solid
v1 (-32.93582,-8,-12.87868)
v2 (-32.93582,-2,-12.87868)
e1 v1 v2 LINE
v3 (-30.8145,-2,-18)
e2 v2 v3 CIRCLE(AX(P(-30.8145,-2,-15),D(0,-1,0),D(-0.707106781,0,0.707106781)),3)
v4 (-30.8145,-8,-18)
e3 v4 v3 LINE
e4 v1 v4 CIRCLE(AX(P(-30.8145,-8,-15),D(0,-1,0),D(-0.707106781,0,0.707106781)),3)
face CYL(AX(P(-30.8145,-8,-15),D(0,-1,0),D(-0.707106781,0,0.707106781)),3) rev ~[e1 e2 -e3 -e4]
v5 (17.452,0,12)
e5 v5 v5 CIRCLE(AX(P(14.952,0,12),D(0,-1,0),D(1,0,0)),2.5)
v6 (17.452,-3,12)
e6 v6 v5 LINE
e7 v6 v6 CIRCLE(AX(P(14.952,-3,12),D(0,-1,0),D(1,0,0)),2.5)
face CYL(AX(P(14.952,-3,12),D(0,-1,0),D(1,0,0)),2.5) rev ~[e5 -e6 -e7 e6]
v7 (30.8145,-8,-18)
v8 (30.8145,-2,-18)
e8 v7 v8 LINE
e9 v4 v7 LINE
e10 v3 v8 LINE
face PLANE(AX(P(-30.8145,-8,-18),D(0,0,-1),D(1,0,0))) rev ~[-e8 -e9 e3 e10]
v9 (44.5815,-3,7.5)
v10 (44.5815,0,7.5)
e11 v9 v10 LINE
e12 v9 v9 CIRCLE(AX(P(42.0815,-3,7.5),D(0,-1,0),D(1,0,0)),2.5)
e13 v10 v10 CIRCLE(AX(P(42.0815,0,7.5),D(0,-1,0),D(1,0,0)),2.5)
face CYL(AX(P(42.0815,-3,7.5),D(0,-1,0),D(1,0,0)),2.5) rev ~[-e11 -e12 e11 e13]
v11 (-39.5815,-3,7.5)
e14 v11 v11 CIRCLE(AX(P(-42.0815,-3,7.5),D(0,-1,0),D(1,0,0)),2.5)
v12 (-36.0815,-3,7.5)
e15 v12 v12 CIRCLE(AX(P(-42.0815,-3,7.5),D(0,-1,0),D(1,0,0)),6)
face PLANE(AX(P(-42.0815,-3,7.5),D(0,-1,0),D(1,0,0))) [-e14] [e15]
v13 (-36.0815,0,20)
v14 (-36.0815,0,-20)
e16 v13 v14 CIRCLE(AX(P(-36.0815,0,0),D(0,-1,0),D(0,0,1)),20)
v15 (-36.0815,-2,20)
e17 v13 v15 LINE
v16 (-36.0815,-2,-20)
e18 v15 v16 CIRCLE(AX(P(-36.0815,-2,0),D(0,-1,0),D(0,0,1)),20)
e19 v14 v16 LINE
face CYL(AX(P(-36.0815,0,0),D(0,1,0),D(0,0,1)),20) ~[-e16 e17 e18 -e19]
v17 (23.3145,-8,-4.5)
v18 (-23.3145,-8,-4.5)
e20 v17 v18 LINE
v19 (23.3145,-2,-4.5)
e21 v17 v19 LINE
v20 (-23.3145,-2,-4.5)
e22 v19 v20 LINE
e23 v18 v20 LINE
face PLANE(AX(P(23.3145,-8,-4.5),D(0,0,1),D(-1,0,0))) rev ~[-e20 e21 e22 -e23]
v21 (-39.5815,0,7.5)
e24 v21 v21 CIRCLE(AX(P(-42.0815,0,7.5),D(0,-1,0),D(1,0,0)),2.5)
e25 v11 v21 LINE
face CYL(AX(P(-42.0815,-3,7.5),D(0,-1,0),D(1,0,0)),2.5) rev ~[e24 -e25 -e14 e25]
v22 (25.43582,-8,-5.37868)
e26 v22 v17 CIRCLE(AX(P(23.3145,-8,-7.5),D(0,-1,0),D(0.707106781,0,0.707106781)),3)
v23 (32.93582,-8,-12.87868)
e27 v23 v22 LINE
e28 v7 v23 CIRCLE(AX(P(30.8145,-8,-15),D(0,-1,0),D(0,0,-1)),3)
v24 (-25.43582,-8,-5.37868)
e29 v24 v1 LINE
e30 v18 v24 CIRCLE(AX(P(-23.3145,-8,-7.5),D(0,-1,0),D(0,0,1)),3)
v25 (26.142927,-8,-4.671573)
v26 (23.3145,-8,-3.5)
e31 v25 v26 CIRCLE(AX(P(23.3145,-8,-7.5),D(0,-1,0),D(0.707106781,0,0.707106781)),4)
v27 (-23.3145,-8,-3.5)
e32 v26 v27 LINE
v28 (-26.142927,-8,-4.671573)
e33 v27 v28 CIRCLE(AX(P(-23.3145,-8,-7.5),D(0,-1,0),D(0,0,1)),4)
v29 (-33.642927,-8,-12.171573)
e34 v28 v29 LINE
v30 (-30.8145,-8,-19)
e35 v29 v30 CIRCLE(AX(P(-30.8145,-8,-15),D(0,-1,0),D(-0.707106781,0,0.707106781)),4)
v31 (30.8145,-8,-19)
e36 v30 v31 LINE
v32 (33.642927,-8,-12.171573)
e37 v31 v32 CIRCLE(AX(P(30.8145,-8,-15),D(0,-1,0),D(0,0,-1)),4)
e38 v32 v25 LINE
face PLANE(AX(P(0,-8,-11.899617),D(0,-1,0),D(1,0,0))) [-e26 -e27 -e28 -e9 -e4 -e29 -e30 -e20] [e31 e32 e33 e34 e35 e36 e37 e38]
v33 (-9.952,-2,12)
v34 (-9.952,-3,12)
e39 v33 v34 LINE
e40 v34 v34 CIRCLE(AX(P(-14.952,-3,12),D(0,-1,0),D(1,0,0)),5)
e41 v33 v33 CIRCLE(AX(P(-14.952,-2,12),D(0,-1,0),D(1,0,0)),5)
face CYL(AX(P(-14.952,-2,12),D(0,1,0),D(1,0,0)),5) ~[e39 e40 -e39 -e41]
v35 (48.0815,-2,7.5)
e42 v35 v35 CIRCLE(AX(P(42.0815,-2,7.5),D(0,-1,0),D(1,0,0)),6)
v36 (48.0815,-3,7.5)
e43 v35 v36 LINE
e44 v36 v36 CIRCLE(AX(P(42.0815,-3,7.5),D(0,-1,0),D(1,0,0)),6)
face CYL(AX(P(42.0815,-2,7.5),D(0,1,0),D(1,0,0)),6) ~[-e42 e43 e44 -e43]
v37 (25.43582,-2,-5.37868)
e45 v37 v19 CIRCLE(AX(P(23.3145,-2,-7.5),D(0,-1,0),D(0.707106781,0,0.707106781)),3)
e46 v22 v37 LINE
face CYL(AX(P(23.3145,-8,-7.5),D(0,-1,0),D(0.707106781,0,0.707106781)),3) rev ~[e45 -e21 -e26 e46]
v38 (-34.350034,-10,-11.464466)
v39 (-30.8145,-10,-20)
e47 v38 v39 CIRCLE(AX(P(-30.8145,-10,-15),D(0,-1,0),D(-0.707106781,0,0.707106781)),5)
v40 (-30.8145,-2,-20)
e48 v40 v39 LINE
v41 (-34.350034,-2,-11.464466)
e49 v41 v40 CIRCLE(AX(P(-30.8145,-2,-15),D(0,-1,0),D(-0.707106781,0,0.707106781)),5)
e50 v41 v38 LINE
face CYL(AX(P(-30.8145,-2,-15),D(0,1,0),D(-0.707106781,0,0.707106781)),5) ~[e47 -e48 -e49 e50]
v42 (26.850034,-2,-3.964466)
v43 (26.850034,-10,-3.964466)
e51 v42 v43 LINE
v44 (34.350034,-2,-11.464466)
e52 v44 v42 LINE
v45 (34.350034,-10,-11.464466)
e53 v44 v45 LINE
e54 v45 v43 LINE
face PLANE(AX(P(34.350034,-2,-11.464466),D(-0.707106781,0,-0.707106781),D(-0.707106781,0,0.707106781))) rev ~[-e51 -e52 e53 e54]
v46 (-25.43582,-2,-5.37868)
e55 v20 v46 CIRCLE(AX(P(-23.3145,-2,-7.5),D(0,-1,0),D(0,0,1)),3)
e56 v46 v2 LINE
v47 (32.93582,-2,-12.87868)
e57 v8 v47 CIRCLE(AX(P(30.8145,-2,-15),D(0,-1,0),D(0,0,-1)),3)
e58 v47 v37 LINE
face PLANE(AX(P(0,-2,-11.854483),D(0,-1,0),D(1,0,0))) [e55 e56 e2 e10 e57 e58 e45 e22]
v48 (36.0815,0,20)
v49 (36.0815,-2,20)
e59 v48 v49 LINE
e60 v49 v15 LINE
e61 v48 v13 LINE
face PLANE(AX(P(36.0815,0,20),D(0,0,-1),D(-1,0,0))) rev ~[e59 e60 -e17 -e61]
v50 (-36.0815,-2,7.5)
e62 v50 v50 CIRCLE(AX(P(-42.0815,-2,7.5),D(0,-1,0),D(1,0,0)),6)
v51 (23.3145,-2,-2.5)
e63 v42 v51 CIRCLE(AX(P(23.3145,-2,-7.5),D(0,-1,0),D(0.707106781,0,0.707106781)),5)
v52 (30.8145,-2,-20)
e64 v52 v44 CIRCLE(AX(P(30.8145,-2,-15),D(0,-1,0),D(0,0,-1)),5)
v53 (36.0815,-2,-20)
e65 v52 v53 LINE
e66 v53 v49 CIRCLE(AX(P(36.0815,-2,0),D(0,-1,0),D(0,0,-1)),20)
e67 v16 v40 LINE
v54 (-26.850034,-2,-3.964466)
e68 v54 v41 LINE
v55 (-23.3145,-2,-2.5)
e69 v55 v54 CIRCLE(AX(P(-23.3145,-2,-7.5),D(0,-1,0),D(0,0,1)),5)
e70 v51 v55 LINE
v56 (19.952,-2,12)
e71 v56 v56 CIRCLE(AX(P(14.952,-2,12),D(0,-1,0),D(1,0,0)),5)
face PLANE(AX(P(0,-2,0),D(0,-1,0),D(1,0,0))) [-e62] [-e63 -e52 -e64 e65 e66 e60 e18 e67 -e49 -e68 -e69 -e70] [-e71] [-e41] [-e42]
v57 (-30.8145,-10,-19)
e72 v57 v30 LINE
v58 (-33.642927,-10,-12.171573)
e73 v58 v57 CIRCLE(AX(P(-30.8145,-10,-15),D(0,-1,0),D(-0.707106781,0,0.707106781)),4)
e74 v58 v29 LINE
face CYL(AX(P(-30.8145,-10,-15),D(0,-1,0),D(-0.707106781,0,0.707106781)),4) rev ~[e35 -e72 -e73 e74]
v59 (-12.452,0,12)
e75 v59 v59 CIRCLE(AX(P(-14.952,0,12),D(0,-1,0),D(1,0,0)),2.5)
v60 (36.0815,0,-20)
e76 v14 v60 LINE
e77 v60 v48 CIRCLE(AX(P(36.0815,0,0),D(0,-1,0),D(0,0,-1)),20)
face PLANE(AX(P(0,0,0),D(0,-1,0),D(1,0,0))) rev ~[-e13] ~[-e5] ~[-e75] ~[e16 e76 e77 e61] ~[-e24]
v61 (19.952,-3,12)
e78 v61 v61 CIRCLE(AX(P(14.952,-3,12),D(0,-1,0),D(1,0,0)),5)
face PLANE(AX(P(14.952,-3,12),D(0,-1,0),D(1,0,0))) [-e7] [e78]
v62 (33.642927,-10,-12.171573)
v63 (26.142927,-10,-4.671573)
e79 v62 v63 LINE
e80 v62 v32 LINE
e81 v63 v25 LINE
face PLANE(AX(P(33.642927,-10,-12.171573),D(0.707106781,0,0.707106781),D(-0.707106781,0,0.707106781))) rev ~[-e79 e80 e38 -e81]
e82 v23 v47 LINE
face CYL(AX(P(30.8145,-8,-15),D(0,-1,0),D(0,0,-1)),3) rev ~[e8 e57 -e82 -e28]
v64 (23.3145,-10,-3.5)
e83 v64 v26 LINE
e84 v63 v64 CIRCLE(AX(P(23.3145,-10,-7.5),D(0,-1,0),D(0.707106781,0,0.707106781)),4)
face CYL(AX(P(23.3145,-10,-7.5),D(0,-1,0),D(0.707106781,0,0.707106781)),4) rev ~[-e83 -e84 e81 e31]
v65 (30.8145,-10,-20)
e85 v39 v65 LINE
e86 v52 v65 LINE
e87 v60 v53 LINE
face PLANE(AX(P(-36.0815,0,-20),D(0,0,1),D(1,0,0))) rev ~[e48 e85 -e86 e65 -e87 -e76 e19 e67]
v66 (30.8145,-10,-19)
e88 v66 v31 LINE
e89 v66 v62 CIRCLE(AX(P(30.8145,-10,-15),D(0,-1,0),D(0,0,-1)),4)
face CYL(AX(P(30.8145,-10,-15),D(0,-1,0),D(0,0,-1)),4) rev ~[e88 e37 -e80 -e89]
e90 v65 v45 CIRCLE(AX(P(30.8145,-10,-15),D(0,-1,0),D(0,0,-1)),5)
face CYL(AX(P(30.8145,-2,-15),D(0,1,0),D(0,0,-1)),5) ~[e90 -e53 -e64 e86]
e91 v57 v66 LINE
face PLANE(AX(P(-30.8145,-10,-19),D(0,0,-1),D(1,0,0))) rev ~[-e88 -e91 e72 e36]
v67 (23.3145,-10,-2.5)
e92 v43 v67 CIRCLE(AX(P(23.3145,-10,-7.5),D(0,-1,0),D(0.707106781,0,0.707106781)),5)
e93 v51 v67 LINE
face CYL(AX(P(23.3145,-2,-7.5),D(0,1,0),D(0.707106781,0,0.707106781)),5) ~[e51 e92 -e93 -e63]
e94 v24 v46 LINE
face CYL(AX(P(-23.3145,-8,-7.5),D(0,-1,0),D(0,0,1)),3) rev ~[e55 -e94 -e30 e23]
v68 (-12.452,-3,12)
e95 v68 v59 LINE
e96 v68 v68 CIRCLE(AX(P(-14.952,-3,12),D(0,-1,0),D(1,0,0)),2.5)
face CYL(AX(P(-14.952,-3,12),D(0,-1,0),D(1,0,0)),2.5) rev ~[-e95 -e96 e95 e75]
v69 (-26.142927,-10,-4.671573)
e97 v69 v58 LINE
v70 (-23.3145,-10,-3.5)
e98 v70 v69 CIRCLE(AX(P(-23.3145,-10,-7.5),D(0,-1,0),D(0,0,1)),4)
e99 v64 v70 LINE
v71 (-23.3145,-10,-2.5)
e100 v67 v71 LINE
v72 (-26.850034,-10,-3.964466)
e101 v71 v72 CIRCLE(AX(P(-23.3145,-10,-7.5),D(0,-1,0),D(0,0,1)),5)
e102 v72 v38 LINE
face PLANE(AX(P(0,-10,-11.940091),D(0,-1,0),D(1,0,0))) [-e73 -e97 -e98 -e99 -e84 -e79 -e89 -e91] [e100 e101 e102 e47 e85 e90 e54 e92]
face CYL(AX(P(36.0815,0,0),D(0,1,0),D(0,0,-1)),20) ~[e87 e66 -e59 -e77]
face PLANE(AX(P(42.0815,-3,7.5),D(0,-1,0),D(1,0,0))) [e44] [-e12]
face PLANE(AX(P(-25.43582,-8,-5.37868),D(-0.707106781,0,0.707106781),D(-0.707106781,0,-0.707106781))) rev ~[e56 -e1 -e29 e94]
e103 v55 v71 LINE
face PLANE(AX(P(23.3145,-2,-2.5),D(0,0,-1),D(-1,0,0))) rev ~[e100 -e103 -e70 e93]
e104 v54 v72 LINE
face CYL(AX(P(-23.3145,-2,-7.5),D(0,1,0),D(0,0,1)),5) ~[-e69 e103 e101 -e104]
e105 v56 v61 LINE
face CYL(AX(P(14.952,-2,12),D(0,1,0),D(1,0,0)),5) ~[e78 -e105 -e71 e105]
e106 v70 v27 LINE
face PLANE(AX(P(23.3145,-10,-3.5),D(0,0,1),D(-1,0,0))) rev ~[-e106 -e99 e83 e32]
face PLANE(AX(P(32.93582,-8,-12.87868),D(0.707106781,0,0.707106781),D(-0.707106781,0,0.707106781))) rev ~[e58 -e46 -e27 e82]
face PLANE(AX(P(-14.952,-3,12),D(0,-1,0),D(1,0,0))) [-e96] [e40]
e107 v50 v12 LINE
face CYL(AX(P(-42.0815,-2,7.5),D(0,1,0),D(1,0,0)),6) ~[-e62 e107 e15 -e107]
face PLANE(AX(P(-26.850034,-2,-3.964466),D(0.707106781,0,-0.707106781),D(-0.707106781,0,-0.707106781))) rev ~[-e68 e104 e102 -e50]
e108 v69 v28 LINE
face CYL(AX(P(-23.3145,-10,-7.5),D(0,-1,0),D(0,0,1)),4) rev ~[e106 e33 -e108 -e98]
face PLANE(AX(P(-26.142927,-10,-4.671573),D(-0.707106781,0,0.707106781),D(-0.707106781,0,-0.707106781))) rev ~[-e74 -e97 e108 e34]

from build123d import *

# Parameters (mm, degrees)
F1_DEPTH  = 2
F3_DEPTH  = 8
F5_DEPTH  = 2
F7_DEPTH  = 6
F8_R      = 5
F8_R_2    = 6
F9_DEPTH  = 1
F10_R     = 2.5
F11_R     = 2.5
F12_DEPTH = 3.001


# Not quite as in the source:
# - a feature names something its author has since deleted; it is built from what else it names


with BuildPart() as f1:
    # F0 (on Front) → F1 (new body)
    with BuildSketch(Plane.XZ):
        with BuildLine():
            Line((-36.0815, -20), (36.0815, -20))
            ThreePointArc((36.0815, -20), (56.0815, 0), (36.0815, 20))
            Line((36.0815, 20), (-36.0815, 20))
            ThreePointArc((-36.0815, 20), (-56.0815, 0), (-36.0815, -20))
        make_face()
    extrude(amount=F1_DEPTH)

    # F2 (on face) → F3 (join)
    with BuildSketch(Plane.XZ.offset(2)):
        with BuildLine():
            Line((23.3145, -2.5), (0, -2.5))
            Line((0, -2.5), (-23.3145, -2.5))
            ThreePointArc((-23.3145, -2.5), (-25.2279171618, -2.8806023374), (-26.8500339059, -3.9644660941))
            Line((-26.8500339059, -3.9644660941), (-34.3500339059, -11.4644660941))
            ThreePointArc((-34.3500339059, -11.4644660941), (-35.4338976626, -16.9134171618), (-30.8145, -20))
            Line((-30.8145, -20), (0, -20))
            Line((0, -20), (30.8145, -20))
            ThreePointArc((30.8145, -20), (35.4338976626, -16.9134171618), (34.3500339059, -11.4644660941))
            Line((34.3500339059, -11.4644660941), (26.8500339059, -3.9644660941))
            ThreePointArc((26.8500339059, -3.9644660941), (25.2279171618, -2.8806023374), (23.3145, -2.5))
        make_face()
    extrude(amount=F3_DEPTH)

    # F4 (on face) → F5 (cut)
    with BuildSketch(Plane.XZ.offset(10)):
        with BuildLine():
            Line((-26.1429271247, -4.6715728753), (-33.6429271247, -12.1715728753))
            ThreePointArc((-33.6429271247, -12.1715728753), (-34.51001813, -16.5307337295), (-30.8145, -19))
            Line((-30.8145, -19), (30.8145, -19))
            ThreePointArc((30.8145, -19), (34.51001813, -16.5307337295), (33.6429271247, -12.1715728753))
            Line((33.6429271247, -12.1715728753), (26.1429271247, -4.6715728753))
            ThreePointArc((26.1429271247, -4.6715728753), (24.8452337295, -3.80448187), (23.3145, -3.5))
            Line((23.3145, -3.5), (-23.3145, -3.5))
            ThreePointArc((-23.3145, -3.5), (-24.8452337295, -3.80448187), (-26.1429271247, -4.6715728753))
        make_face()
    extrude(amount=-F5_DEPTH, mode=Mode.SUBTRACT)

    # F6 (on face) → F7 (cut)
    with BuildSketch(Plane.XZ.offset(8)):
        with BuildLine():
            ThreePointArc((30.8145, -18), (33.5861385975, -16.1480502971), (32.9358203436, -12.8786796564))
            Line((32.9358203436, -12.8786796564), (25.4358203436, -5.3786796564))
            ThreePointArc((25.4358203436, -5.3786796564), (24.4625502971, -4.7283614025), (23.3145, -4.5))
            Line((23.3145, -4.5), (-23.3145, -4.5))
            ThreePointArc((-23.3145, -4.5), (-24.4625502971, -4.7283614025), (-25.4358203436, -5.3786796564))
            Line((-25.4358203436, -5.3786796564), (-32.9358203436, -12.8786796564))
            ThreePointArc((-32.9358203436, -12.8786796564), (-33.5861385975, -16.1480502971), (-30.8145, -18))
            Line((-30.8145, -18), (30.8145, -18))
        make_face()
    extrude(amount=-F7_DEPTH, mode=Mode.SUBTRACT)

    # F8 (on face) → F9 (join)
    with BuildSketch(Plane.XZ.offset(2)):
        with Locations((-14.952, 12)):
            Circle(F8_R)
        with Locations((-42.0815, 7.5)):
            Circle(F8_R_2)
        with Locations((14.952, 12)):
            Circle(F8_R)
        with Locations((42.0815, 7.5)):
            Circle(F8_R_2)
    extrude(amount=F9_DEPTH)

    # F10 (on face) + F11 (on face) → F12 (cut, through all)
    with BuildSketch(Plane.XZ.offset(3)):
        with Locations((-14.952, 12)):
            Circle(F10_R)
        with Locations((14.952, 12)):
            Circle(F10_R)
    with BuildSketch(Plane.XZ.offset(3)):
        with Locations((-42.0815, 7.5)):
            Circle(F11_R)
        with Locations((42.0815, 7.5)):
            Circle(F11_R)
    extrude(amount=-F12_DEPTH, mode=Mode.SUBTRACT)


solid = f1.part
